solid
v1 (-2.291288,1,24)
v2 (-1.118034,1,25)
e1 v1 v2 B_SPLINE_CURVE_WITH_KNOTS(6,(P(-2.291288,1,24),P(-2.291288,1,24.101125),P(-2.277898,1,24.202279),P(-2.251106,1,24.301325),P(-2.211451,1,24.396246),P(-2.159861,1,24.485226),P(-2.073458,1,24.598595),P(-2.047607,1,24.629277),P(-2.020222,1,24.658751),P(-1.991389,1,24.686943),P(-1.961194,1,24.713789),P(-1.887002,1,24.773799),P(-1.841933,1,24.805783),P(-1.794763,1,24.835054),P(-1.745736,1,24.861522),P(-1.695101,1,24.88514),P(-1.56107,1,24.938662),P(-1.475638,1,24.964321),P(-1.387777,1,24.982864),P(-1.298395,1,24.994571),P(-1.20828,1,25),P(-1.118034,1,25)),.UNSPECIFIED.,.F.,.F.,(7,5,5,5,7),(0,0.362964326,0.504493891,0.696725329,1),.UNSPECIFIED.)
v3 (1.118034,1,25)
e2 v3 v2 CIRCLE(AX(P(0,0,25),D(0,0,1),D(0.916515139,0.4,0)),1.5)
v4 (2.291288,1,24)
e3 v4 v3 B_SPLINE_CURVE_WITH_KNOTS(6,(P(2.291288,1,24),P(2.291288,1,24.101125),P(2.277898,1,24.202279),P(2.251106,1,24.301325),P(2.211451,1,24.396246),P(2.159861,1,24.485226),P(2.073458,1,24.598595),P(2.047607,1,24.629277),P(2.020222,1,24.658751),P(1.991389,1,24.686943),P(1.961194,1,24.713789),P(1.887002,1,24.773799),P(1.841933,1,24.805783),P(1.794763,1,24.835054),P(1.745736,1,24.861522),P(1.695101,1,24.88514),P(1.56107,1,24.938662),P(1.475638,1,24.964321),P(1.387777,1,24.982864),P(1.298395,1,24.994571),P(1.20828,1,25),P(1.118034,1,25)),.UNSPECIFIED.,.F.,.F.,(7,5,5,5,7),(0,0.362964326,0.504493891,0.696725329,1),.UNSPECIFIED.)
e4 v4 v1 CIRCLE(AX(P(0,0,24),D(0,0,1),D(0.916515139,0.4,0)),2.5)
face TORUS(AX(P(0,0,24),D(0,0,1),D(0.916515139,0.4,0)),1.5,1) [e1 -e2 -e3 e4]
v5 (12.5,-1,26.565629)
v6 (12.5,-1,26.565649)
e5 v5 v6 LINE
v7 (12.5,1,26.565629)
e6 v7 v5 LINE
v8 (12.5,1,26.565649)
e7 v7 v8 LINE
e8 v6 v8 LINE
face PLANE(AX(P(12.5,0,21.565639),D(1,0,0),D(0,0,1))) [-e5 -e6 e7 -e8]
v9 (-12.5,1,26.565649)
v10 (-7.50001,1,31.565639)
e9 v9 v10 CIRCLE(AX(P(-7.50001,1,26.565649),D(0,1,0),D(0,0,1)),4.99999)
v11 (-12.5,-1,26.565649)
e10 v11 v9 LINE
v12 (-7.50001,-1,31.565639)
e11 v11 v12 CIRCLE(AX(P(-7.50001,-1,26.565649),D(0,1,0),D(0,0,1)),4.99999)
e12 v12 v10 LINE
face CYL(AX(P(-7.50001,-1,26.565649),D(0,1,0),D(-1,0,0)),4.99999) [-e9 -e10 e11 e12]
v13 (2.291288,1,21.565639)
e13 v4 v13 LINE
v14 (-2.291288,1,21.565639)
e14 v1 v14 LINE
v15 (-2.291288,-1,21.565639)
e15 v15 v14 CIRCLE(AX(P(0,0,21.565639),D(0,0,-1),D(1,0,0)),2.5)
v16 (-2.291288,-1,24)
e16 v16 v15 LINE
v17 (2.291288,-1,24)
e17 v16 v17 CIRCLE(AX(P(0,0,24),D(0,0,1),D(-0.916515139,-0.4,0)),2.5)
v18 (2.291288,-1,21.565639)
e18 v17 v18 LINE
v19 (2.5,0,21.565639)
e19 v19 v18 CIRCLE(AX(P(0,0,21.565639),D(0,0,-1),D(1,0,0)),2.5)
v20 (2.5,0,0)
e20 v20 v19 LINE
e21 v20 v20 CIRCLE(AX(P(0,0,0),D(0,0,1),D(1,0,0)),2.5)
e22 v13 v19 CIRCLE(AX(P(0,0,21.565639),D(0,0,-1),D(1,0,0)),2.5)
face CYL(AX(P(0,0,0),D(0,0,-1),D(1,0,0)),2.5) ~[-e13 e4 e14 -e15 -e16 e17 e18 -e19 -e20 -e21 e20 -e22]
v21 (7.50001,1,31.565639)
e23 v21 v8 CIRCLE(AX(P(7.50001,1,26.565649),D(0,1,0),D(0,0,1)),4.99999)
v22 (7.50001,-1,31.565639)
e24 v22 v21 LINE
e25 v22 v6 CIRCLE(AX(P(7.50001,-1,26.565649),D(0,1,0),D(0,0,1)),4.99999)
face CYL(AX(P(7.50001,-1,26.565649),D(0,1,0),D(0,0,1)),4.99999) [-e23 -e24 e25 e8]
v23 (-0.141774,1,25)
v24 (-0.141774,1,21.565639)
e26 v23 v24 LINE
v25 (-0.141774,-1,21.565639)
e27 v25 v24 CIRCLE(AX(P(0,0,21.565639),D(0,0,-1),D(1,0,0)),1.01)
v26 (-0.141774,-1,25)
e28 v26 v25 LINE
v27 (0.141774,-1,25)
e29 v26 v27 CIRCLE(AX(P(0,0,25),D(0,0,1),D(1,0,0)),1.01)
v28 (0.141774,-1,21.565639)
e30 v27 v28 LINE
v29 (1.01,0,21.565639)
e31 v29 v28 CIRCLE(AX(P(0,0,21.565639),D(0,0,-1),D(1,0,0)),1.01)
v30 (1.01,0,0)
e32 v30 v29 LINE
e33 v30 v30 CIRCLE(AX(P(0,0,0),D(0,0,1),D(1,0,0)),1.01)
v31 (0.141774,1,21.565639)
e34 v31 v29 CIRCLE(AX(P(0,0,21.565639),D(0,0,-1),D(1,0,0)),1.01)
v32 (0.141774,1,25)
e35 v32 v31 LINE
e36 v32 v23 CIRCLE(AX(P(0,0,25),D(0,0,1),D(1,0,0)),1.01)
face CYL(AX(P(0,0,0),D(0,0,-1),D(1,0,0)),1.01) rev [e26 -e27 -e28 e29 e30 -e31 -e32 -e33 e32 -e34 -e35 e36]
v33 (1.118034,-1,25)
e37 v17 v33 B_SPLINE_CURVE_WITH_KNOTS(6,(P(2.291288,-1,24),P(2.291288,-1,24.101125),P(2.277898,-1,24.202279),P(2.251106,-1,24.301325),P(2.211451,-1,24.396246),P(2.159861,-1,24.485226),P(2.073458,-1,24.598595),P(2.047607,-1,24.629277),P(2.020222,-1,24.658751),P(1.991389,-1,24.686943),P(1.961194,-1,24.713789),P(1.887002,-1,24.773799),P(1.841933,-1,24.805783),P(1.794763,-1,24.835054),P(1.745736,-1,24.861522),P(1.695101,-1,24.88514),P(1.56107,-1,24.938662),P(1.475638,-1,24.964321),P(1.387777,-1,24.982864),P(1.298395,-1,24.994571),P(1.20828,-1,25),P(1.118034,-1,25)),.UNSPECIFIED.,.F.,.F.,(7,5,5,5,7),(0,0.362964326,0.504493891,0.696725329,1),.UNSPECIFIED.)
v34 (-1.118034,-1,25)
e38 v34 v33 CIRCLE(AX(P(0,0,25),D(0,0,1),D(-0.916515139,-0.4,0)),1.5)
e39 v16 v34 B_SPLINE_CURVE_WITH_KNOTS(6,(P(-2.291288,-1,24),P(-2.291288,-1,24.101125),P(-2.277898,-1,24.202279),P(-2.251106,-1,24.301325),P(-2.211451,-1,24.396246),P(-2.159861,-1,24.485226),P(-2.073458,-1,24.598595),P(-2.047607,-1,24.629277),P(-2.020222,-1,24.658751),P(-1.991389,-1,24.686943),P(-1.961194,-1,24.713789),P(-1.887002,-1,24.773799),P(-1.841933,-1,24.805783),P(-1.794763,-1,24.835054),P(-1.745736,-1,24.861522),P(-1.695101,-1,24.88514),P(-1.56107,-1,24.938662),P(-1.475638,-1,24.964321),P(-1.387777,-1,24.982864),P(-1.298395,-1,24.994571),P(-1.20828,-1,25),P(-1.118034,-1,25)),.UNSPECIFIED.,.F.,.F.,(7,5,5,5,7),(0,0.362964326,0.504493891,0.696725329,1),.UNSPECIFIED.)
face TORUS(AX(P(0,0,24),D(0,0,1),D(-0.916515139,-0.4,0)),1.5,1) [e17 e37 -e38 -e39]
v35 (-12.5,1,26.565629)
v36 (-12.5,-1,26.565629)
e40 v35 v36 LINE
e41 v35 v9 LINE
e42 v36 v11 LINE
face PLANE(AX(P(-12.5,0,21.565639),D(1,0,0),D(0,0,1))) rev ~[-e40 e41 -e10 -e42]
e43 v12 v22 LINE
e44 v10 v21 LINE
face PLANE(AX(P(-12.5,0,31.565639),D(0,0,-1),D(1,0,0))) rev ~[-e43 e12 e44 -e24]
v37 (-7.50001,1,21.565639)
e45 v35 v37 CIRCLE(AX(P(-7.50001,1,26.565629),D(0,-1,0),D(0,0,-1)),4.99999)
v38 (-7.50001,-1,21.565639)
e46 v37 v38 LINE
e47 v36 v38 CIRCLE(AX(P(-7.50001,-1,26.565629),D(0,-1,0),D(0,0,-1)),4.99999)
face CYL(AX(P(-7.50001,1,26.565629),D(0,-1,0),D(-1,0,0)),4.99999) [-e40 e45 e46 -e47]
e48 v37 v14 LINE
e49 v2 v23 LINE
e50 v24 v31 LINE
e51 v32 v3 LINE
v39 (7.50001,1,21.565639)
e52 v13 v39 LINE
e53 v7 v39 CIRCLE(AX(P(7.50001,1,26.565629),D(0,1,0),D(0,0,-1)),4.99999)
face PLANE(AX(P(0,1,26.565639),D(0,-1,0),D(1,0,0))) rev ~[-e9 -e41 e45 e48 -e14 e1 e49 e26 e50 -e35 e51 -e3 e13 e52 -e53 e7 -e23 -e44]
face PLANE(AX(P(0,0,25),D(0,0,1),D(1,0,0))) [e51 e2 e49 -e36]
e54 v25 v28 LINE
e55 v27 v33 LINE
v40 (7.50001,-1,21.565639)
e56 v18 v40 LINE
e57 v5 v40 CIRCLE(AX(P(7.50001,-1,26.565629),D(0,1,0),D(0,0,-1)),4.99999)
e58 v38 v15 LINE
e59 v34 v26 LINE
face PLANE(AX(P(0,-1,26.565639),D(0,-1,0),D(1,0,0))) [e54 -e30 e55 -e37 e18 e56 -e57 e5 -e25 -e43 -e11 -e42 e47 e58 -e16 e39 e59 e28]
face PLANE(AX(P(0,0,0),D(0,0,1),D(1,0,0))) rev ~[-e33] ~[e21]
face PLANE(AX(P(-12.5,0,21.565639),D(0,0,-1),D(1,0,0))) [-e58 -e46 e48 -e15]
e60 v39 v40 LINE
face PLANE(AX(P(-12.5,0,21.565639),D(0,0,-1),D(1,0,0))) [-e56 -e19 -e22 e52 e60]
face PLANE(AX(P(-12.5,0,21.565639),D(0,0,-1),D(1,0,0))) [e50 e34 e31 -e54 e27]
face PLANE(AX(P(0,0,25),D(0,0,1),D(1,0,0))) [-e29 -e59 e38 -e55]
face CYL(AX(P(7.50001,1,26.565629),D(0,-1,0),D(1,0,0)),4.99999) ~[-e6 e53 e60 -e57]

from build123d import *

# Parameters (mm, degrees)
F0_R     = 2.5
F0_R_2   = 1.01
F1_DEPTH = 25
F2_W     = 25
F2_H     = 10
F3_DEPTH = 1
F4_R     = 4.99999
F5_R     = 1


# Not quite as in the source:
# - a fillet or chamfer is up to 0.001 mm smaller than in the source, because OpenCascade refuses the exact size


with BuildPart() as f1:
    # F0 (on Top) → F1 (new body)
    with BuildSketch(Plane.XY):
        Circle(F0_R)
        Circle(F0_R_2, mode=Mode.SUBTRACT)
    extrude(amount=F1_DEPTH)

    # F2 (on Front) → F3 (join, symmetric)
    with BuildSketch(Plane.XZ):
        with Locations((0, 26.5656393021)):
            Rectangle(F2_W, F2_H)
    extrude(amount=F3_DEPTH, both=True)

    # F4 (radius 5 in the source; OpenCascade refuses exactly that, so slightly less here)
    f4_edges = [f1.edges().sort_by_distance(p)[0] for p in [
        (-12.5, 0, 21.565639),
        (-12.5, 0, 31.565639),
        (12.5, 0, 21.565639),
        (12.5, 0, 31.565639),
    ]]
    fillet(f4_edges, radius=F4_R)

    # F5
    f5_edges = [f1.edges().sort_by_distance(p)[0] for p in [
        (0, 2.5, 25),
        (0, -2.5, 25),
    ]]
    fillet(f5_edges, radius=F5_R)


solid = f1.part
